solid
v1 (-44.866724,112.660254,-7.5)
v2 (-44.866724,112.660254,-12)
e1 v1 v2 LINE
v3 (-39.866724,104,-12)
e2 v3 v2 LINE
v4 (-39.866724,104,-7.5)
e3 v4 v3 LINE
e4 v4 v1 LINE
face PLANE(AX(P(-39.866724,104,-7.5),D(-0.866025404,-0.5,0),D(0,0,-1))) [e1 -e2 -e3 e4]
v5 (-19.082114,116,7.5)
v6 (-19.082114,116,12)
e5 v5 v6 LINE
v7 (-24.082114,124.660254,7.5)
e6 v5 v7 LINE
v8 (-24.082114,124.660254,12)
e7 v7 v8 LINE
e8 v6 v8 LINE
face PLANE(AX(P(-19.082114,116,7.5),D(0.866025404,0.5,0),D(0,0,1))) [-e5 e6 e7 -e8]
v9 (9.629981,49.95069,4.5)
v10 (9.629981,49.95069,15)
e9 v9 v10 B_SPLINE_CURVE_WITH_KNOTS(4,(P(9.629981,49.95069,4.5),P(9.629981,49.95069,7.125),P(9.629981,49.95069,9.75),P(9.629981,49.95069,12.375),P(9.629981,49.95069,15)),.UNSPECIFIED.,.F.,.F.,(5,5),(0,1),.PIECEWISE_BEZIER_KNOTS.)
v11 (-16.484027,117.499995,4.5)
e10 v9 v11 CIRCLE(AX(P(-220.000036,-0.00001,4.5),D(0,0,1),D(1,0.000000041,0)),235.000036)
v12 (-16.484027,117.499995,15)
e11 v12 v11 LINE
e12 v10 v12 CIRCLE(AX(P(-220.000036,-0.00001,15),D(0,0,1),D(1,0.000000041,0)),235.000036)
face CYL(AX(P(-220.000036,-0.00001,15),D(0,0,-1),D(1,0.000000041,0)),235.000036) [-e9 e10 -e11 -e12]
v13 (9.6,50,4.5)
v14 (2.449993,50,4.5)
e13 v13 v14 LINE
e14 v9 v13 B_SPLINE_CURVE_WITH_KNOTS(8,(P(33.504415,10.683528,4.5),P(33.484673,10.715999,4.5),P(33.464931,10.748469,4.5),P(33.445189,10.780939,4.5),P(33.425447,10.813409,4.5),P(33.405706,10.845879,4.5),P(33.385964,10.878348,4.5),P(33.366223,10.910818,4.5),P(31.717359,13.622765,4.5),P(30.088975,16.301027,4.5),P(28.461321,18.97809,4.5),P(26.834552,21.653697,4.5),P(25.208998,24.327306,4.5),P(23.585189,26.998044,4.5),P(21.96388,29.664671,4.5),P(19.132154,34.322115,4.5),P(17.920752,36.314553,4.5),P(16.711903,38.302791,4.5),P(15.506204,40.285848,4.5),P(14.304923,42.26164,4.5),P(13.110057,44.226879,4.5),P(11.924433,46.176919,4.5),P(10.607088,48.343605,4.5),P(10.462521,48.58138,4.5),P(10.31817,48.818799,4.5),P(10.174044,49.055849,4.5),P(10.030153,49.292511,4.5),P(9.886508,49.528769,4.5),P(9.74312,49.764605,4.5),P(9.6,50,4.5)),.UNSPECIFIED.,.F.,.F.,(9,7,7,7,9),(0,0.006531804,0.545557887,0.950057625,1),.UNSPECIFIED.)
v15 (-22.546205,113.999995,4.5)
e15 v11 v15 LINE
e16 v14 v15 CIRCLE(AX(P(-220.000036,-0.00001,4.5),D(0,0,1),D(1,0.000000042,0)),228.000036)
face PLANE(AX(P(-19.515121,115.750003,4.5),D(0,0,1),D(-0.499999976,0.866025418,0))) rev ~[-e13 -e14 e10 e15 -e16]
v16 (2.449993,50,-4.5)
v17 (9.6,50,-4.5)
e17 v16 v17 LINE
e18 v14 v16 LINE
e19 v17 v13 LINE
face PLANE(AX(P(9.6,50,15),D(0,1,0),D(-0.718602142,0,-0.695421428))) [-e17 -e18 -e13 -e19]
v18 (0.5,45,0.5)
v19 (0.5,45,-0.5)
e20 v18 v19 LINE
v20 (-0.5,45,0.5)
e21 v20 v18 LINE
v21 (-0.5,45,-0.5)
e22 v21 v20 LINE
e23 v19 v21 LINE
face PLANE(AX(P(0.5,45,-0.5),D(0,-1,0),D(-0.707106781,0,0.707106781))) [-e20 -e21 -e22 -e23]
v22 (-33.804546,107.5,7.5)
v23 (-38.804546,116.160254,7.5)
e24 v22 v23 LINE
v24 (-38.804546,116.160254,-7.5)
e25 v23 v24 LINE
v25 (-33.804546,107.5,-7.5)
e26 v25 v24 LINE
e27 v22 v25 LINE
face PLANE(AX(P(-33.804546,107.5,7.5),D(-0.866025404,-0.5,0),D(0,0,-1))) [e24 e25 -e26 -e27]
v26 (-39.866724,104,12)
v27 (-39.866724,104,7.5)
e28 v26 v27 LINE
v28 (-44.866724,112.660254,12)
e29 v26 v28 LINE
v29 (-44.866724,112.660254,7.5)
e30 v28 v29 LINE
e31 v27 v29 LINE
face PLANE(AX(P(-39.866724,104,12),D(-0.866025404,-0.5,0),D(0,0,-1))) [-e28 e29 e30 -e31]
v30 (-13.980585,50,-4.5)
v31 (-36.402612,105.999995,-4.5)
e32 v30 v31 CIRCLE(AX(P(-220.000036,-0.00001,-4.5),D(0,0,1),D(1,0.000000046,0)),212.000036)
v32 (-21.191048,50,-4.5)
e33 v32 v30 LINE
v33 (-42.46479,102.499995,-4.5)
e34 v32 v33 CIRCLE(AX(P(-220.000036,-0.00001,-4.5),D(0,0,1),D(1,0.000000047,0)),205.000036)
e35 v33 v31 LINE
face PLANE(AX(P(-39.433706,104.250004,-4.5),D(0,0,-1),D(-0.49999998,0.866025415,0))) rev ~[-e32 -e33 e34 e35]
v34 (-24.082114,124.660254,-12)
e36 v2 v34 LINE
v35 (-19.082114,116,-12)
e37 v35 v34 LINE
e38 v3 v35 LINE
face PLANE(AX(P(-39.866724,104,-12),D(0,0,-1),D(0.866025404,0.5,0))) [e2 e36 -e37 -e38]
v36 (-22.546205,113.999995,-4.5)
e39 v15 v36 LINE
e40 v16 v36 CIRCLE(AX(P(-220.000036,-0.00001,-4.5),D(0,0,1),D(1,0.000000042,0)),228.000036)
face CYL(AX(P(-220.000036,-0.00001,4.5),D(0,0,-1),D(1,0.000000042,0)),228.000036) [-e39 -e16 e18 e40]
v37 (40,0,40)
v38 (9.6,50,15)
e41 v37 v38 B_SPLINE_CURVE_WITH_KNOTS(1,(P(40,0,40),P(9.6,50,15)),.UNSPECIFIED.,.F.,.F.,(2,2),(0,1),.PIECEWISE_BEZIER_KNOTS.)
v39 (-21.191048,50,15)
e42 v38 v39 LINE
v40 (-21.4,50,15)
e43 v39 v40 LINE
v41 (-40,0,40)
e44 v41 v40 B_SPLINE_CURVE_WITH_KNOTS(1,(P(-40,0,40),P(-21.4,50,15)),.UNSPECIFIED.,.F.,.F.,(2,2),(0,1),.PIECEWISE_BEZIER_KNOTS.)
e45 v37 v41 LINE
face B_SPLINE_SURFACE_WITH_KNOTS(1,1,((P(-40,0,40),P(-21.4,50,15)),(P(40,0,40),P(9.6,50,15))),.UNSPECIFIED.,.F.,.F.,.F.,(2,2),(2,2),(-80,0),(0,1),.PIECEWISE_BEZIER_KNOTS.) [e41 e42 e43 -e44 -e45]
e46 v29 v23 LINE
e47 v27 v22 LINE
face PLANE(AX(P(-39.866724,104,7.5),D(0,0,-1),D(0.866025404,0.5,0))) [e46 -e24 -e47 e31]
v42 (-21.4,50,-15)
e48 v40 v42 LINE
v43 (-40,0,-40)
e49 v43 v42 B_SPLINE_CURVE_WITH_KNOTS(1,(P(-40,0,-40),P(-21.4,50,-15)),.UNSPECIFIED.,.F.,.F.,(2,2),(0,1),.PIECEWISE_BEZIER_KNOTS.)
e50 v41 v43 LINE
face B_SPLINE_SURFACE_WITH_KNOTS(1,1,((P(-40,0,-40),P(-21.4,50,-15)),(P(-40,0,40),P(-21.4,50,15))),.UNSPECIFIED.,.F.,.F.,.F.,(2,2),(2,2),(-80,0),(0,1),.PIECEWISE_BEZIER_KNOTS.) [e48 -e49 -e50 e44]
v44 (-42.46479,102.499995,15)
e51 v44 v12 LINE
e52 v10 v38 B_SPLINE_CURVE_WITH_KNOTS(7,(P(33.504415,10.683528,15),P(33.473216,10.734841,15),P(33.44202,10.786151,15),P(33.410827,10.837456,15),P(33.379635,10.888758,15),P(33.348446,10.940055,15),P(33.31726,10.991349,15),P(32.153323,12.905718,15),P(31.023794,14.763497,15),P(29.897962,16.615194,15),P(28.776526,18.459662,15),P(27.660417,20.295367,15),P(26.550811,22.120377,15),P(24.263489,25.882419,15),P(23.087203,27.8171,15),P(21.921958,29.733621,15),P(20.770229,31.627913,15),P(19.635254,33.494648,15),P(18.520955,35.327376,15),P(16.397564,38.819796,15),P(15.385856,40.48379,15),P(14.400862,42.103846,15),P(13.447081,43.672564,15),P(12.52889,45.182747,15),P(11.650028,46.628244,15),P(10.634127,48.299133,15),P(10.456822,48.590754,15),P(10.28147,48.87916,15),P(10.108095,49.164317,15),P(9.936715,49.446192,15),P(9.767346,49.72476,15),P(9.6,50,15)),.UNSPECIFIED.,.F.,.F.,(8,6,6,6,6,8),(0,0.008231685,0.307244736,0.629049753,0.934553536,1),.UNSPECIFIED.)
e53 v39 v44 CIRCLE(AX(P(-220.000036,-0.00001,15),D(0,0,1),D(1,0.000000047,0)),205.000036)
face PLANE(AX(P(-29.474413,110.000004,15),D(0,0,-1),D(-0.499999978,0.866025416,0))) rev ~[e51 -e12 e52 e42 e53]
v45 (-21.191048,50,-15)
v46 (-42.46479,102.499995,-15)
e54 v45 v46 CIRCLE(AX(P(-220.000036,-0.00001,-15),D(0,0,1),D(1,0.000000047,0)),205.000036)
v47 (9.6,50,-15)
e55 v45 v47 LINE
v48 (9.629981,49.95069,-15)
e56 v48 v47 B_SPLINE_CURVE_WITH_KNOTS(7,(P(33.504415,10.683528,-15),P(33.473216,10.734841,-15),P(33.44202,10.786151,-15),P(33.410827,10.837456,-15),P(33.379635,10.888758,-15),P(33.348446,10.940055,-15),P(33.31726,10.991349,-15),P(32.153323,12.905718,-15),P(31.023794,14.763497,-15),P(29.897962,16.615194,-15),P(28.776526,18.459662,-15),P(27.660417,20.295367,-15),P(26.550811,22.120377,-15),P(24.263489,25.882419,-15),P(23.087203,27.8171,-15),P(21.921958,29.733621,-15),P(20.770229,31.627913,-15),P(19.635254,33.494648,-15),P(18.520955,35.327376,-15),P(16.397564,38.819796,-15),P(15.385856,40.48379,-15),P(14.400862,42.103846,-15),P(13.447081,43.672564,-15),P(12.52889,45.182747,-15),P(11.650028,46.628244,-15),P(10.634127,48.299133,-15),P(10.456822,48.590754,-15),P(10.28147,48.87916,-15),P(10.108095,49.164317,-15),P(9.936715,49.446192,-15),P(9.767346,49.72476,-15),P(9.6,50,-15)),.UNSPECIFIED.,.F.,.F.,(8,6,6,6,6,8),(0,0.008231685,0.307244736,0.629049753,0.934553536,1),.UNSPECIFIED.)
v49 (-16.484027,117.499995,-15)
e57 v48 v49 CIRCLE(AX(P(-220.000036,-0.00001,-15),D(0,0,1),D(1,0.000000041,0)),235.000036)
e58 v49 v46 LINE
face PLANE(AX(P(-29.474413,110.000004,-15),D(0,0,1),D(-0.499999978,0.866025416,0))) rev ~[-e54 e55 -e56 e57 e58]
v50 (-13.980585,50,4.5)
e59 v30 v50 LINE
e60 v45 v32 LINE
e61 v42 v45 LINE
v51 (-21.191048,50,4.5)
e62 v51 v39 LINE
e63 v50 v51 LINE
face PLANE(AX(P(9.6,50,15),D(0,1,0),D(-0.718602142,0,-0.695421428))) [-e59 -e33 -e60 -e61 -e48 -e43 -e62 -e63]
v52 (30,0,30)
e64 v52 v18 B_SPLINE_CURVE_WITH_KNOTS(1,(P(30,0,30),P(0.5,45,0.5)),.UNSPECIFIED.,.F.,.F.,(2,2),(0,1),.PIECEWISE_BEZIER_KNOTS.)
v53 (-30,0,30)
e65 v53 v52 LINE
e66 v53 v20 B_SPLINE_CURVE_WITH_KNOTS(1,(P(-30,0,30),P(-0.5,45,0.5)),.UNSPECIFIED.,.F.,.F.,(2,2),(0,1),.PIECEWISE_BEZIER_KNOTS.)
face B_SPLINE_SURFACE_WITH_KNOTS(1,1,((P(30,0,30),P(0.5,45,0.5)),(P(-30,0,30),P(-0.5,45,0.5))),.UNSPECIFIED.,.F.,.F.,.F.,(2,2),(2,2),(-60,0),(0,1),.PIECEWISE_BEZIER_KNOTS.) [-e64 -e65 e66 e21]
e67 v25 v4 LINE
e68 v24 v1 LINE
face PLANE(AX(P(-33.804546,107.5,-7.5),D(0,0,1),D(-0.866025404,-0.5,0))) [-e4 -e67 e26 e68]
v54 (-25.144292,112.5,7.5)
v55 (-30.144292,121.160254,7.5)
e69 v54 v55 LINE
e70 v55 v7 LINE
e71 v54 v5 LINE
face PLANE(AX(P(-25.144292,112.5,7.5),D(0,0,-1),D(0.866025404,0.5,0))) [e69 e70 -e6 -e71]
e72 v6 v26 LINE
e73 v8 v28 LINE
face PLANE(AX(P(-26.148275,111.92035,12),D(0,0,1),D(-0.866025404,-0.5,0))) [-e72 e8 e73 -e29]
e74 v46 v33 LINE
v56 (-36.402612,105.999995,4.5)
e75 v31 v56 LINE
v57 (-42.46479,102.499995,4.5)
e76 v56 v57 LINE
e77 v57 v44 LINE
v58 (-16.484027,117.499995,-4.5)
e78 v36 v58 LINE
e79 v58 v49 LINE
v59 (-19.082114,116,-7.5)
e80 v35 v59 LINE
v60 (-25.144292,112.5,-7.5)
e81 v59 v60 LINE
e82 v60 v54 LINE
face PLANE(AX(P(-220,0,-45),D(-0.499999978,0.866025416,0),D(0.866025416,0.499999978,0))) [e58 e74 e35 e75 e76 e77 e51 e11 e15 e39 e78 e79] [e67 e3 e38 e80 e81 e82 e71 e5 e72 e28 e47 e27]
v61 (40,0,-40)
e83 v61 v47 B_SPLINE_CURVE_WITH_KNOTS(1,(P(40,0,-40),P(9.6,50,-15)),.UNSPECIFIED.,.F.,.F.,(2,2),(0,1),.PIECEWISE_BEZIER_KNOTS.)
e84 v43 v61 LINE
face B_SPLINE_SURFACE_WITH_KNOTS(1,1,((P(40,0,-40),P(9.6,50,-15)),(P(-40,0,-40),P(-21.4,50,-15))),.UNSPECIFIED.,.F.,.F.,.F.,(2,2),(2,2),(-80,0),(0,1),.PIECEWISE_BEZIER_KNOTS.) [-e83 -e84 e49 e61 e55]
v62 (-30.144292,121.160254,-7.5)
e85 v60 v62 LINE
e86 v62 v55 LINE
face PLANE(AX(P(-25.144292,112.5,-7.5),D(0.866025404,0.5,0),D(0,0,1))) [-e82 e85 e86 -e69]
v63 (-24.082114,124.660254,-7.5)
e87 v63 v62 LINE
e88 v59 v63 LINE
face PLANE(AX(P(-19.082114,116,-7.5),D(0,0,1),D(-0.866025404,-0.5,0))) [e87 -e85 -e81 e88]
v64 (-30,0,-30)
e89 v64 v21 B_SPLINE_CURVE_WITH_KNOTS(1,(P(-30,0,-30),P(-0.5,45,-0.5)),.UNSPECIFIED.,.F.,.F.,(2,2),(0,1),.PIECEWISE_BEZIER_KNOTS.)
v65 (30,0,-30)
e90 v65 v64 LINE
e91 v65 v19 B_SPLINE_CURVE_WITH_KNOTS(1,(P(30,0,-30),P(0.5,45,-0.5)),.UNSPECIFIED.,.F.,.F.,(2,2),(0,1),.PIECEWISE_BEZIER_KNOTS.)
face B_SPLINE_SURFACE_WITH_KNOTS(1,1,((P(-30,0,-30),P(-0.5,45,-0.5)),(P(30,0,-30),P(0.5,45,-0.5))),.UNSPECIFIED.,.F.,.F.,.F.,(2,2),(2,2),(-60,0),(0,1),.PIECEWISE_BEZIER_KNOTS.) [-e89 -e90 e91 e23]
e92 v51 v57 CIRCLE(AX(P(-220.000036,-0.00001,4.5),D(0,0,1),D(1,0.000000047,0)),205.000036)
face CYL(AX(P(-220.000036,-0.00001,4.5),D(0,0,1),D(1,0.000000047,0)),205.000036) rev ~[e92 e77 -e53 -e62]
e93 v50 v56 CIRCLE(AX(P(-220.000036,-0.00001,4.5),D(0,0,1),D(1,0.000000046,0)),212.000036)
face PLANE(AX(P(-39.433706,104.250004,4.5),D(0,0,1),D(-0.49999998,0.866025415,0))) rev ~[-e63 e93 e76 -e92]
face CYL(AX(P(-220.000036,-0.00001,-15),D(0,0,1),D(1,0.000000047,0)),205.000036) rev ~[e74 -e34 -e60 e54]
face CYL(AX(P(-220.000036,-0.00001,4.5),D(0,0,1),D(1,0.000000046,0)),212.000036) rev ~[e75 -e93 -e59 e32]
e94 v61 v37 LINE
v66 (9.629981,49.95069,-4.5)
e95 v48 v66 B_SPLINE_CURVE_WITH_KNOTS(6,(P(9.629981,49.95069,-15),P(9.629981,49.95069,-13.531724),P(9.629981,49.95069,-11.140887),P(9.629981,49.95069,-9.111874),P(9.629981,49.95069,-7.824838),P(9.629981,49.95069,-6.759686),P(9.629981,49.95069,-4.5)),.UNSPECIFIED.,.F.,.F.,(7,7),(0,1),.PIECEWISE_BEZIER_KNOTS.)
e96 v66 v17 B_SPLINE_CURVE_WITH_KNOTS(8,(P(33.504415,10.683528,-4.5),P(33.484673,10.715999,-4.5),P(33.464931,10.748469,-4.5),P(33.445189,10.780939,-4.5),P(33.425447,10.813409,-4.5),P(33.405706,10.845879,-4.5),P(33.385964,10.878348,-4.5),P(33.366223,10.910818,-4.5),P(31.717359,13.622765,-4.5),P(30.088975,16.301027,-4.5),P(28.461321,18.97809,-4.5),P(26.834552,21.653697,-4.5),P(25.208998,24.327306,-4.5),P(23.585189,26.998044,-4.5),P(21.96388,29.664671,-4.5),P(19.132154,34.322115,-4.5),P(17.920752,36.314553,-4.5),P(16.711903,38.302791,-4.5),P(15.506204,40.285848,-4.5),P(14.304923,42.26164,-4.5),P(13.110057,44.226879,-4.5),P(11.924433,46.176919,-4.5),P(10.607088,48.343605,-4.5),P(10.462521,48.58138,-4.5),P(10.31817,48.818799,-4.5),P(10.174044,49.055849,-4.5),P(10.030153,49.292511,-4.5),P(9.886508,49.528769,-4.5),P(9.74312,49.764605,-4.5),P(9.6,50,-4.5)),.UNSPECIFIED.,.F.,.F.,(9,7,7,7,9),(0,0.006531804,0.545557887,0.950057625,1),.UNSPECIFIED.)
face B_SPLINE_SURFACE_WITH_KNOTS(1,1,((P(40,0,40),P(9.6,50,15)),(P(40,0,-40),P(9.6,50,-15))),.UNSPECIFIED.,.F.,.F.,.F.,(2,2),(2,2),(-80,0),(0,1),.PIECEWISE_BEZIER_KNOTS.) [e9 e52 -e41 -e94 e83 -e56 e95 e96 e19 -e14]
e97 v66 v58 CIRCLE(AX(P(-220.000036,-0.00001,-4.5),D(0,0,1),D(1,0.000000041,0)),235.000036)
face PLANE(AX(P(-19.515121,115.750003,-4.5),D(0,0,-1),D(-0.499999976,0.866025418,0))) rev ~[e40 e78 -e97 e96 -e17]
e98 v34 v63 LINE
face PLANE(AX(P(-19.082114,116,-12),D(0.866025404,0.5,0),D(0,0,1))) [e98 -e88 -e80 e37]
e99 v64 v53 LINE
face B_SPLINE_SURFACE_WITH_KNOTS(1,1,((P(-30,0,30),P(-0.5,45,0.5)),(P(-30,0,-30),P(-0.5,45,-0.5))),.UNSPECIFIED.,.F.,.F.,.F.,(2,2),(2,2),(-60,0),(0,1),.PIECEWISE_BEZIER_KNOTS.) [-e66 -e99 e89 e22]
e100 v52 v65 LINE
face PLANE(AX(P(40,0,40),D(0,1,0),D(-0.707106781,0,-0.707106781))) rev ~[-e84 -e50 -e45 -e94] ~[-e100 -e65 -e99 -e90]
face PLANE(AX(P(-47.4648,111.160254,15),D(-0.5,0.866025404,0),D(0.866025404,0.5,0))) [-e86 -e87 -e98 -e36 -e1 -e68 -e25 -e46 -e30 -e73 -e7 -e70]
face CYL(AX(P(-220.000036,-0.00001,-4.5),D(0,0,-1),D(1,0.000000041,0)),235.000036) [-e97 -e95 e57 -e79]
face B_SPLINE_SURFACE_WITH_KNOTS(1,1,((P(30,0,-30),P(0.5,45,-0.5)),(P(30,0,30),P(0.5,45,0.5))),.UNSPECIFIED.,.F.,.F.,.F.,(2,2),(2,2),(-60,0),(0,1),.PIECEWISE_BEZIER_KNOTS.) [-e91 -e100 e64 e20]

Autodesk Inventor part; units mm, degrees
sketch "Sketch2" plane through (0, 0, 0) normal (0, 1, 0) x (-1, 0, 0)
  line L0 (15, 15) -> (-15, 15)
  line L1 (-15, -15) -> (15, -15)
  line L2 (15, 4.5) -> (8, 4.5)
  line L3 (8, 4.5) -> (8, -4.5)
  line L4 (8, -4.5) -> (15, -4.5)
  line L5 (-15, 4.5) -> (-8, 4.5)
  line L6 (-8, 4.5) -> (-8, -4.5)
  line L7 (-8, -4.5) -> (-15, -4.5)
  line L8 (15, -15) -> (15, -4.5)
  line L9 (15, 4.5) -> (15, 15)
  line L10 (-15, 15) -> (-15, 4.5)
  line L11 (-15, -4.5) -> (-15, -15)
  point P0 (0, 0)
  dimension "d18" = 9
  dimension "d19" = 7
  dimension "d21" = 16
  dimension "d22" = 30
  dimension "d23" = 15
  dimension "d24" = 4.5
  dimension "d25" = 8
sketch "Sketch6" plane through (0, 0, 0) normal (0, 0, 1) x (1, 0, 0)
  arc A0 (0, 0) -> (-110, 190.5256) centre (-220, 0) ccw
  line L0 (-220, 0) -> (-110, 190.5256) construction
  line L1 (-220, 0) -> (0, 0) construction
  dimension "d41" = 220
  dimension "d42" = 60
  dimension "d43" = 220
  dimension "d44" = 0
sweep "Sweep2" add profiles "Sketch2" path "Sketch6"
sketch "Sketch7" plane through (-102.5, 203.516, 4.5) normal (-0.8660254, 0.5, 0) x (0, 0, 1)
  line L0 (-16.5, -3) -> (-12, -3)
  line L1 (-12, -3) -> (-12, -10)
  line L2 (-12, -10) -> (3, -10)
  line L3 (3, -10) -> (3, -3)
  line L4 (3, -3) -> (7.5, -3)
  line L5 (7.5, -3) -> (7.5, -27)
  line L6 (7.5, -27) -> (3, -27)
  line L7 (3, -27) -> (3, -20)
  line L8 (3, -20) -> (-12, -20)
  line L9 (-12, -20) -> (-12, -27)
  line L10 (-12, -27) -> (-16.5, -27)
  line L11 (-16.5, -27) -> (-16.5, -3)
  line L12 (-19.5, 0) -> (-19.5, -30) projected
  line L13 (-9, -7) -> (-9, 0) projected
  line L14 (0, 0) -> (0, -7) projected
  line L15 (10.5, -30) -> (10.5, 0) projected
  line L16 (-19.5, -30) -> (-9, -30) projected
  line L17 (-9, 0) -> (-19.5, 0) projected
  line L18 (0, -30) -> (10.5, -30) projected
  line L19 (-9, -23) -> (0, -23) projected
  line L20 (0, -7) -> (-9, -7) projected
  point P0 (-4.5, -125)
  point P1 (-14.25, 0)
  dimension "d47" = 3
  dimension "d48" = 3
  dimension "d49" = 3
  dimension "d50" = 3
  dimension "d51" = 3
  dimension "d52" = 3
  dimension "d53" = 3
  dimension "d54" = 3
  dimension "d55" = 3
extrude "Extrusion3" add sketch "Sketch7" along normal blind 10
sketch "Sketch8" plane through (-116, 180.1333, -12) normal (0, 0, -1) x (-0.8660254, 0.5, 0)
  circle A0 centre (5, 12) radius 2
  line L0 (0, 0) -> (10, 0) projected
  line L1 (10, 24) -> (10, 0) projected
  point P0 (-190.5256, -98)
  dimension "d58" = 4
  dimension "d59" = 12
  dimension "d60" = 5
extrude "Extrusion4" cut sketch "Sketch8" against normal through all
sketch "Sketch9" plane through (0, 0, 0) normal (0, 1, 0) x (-1, 0, 0)
  line L0 (-40, 40) -> (40, 40)
  line L1 (40, 40) -> (40, -40)
  line L2 (40, -40) -> (-40, -40)
  line L3 (-40, -40) -> (-40, 40)
  point P0 (0, 0)
  dimension "d63" = 80
  dimension "d64" = 80
  dimension "d65" = 40
  dimension "d66" = 40
ref_plane "Work Plane1" through (0, 50, 0) normal (0, 1, 0) x (-1, 0, 0)
sketch "Sketch10" plane through (0, 50, 0) normal (0, 1, 0) x (-1, 0, 0)
  line L0 (-9.6, 15) -> (21.4, 15)
  line L1 (21.4, 15) -> (21.4, -15)
  line L2 (21.4, -15) -> (-9.6, -15)
  line L3 (-9.6, -15) -> (-9.6, 15)
  point P0 (0, 0)
  dimension "d68" = 30
  dimension "d69" = 9.6
  dimension "d70" = 15
  dimension "d71" = 31
loft "Loft1" add profiles "Sketch9", "Sketch10"
ref_plane "Work Plane2" through (0, 0, -79) normal (0, 0, 1) x (1, 0, 0)
sketch "Sketch11" plane through (0, 0, -79) normal (0, 0, 1) x (1, 0, 0)
  line L0 (50, -5) -> (-129.034, -5)
  line L1 (-129.034, -5) -> (-129.034, 135)
  line L2 (-129.034, 135) -> (-90, 202.6089)
  line L3 (-90, 202.6089) -> (50, 95)
  line L4 (50, -5) -> (50, 95)
  point P0 (0, 0)
  dimension "d77" = 100
  dimension "d79" = 140
  dimension "d80" = 67.6089
  dimension "d81" = 140
  dimension "d82" = 150
  dimension "d83" = 50
  dimension "d86" = 5
extrude "Extrusion5" [suppressed]
sketch "Sketch12" plane through (-40, 0, 40) normal (0, -1, 0) x (1, 0, 0)
  line L0 (70, -70) -> (10, -70)
  line L1 (10, -70) -> (10, -10)
  line L2 (10, -10) -> (70, -10)
  line L3 (70, -10) -> (70, -70)
  line L4 (0, 0) -> (0, -80) projected
  line L5 (0, -80) -> (80, -80) projected
  line L6 (80, -80) -> (80, 0) projected
  line L7 (80, 0) -> (0, 0) projected
  point P0 (40, -40)
  dimension "d87" = 10
  dimension "d88" = 10
  dimension "d89" = 10
  dimension "d90" = 10
ref_plane "Work Plane3" through (-40, 45, 40) normal (0, -1, 0) x (1, 0, 0)
sketch "Sketch14" plane through (-40, 45, 40) normal (0, -1, 0) x (1, 0, 0)
  line L0 (40.5, -40.5) -> (39.5, -40.5)
  line L1 (39.5, -40.5) -> (39.5, -39.5)
  line L2 (39.5, -39.5) -> (40.5, -39.5)
  line L3 (40.5, -39.5) -> (40.5, -40.5)
  line L4 (80, 0) -> (0, 0) projected
  line L5 (0, 0) -> (0, -80) projected
  point P0 (40, -40)
  point P1 (0, -40)
  dimension "d95" = 1
  dimension "d96" = 1
  dimension "d97" = 39.5
  dimension "d98" = 39.5
loft "Loft2" cut profiles "Sketch12", "Sketch14" contours L0 L1 L2 L3 / all
ref_plane "Work Plane4" through (9.6, 50, -45) normal (0, 0, -1) x (-1, 0, 0)
sketch "Sketch15" plane through (9.6, 50, -45) normal (0, 0, -1) x (-1, 0, 0)
  line L0 (-151.4512, 170) -> (229.6, 170)
  line L1 (229.6, 170) -> (229.6, -50)
  line L2 (229.6, -50) -> (-151.4512, 170)
  line L3 (0, 0) -> (7.15, 0) construction
  line L4 (229.6, -50) -> (9.6, -50) construction
  dimension "d105" = 220
  dimension "d107" = 0
  dimension "d108" = 30
  dimension "d109" = 220
extrude "Extrusion6" cut sketch "Sketch15" against normal through all
sketch "Sketch16" plane through (-42.4648, 102.5, 15) normal (-0.5, 0.8660254, 0) x (0.8660254, 0.5, 0)
  line L0 (27, 27) -> (27, 22.5)
  line L1 (27, 22.5) -> (20, 22.5)
  line L2 (20, 22.5) -> (20, 7.5)
  line L3 (18.8407, 0) -> (18.8407, 10.5) projected
  line L4 (20, 7.5) -> (27, 7.5)
  line L5 (27, 7.5) -> (27, 3)
  line L6 (27, 3) -> (3, 3)
  line L7 (3, 3) -> (3, 7.5)
  line L8 (3, 7.5) -> (10, 7.5)
  line L9 (10, 7.5) -> (10, 22.5)
  line L10 (10, 22.5) -> (3, 22.5)
  line L11 (3, 22.5) -> (3, 27)
  line L12 (3, 27) -> (27, 27)
  line L13 (30, 30) -> (30, 19.5) projected
  line L14 (30, 19.5) -> (23, 19.5) projected
  line L15 (0, 30) -> (30, 30) projected
  line L16 (23, 19.5) -> (23, 10.5) projected
  line L17 (23, 10.5) -> (30, 10.5) projected
  line L18 (30, 0) -> (0, 0) projected
  line L19 (7, 10.5) -> (7, 19.5) projected
  line L20 (0, 0) -> (0, 10.5) projected
  line L21 (0, 19.5) -> (0, 30) projected
  point P0 (-14.4744, 15)
  dimension "d112" = 3
  dimension "d113" = 3
  dimension "d114" = 3
  dimension "d115" = 3
  dimension "d116" = 3
  dimension "d117" = 3
  dimension "d118" = 3
  dimension "d119" = 3
  dimension "d120" = 3
extrude "Extrusion7" add sketch "Sketch16" along normal blind 10
properties part number "LightRail_endSection"
